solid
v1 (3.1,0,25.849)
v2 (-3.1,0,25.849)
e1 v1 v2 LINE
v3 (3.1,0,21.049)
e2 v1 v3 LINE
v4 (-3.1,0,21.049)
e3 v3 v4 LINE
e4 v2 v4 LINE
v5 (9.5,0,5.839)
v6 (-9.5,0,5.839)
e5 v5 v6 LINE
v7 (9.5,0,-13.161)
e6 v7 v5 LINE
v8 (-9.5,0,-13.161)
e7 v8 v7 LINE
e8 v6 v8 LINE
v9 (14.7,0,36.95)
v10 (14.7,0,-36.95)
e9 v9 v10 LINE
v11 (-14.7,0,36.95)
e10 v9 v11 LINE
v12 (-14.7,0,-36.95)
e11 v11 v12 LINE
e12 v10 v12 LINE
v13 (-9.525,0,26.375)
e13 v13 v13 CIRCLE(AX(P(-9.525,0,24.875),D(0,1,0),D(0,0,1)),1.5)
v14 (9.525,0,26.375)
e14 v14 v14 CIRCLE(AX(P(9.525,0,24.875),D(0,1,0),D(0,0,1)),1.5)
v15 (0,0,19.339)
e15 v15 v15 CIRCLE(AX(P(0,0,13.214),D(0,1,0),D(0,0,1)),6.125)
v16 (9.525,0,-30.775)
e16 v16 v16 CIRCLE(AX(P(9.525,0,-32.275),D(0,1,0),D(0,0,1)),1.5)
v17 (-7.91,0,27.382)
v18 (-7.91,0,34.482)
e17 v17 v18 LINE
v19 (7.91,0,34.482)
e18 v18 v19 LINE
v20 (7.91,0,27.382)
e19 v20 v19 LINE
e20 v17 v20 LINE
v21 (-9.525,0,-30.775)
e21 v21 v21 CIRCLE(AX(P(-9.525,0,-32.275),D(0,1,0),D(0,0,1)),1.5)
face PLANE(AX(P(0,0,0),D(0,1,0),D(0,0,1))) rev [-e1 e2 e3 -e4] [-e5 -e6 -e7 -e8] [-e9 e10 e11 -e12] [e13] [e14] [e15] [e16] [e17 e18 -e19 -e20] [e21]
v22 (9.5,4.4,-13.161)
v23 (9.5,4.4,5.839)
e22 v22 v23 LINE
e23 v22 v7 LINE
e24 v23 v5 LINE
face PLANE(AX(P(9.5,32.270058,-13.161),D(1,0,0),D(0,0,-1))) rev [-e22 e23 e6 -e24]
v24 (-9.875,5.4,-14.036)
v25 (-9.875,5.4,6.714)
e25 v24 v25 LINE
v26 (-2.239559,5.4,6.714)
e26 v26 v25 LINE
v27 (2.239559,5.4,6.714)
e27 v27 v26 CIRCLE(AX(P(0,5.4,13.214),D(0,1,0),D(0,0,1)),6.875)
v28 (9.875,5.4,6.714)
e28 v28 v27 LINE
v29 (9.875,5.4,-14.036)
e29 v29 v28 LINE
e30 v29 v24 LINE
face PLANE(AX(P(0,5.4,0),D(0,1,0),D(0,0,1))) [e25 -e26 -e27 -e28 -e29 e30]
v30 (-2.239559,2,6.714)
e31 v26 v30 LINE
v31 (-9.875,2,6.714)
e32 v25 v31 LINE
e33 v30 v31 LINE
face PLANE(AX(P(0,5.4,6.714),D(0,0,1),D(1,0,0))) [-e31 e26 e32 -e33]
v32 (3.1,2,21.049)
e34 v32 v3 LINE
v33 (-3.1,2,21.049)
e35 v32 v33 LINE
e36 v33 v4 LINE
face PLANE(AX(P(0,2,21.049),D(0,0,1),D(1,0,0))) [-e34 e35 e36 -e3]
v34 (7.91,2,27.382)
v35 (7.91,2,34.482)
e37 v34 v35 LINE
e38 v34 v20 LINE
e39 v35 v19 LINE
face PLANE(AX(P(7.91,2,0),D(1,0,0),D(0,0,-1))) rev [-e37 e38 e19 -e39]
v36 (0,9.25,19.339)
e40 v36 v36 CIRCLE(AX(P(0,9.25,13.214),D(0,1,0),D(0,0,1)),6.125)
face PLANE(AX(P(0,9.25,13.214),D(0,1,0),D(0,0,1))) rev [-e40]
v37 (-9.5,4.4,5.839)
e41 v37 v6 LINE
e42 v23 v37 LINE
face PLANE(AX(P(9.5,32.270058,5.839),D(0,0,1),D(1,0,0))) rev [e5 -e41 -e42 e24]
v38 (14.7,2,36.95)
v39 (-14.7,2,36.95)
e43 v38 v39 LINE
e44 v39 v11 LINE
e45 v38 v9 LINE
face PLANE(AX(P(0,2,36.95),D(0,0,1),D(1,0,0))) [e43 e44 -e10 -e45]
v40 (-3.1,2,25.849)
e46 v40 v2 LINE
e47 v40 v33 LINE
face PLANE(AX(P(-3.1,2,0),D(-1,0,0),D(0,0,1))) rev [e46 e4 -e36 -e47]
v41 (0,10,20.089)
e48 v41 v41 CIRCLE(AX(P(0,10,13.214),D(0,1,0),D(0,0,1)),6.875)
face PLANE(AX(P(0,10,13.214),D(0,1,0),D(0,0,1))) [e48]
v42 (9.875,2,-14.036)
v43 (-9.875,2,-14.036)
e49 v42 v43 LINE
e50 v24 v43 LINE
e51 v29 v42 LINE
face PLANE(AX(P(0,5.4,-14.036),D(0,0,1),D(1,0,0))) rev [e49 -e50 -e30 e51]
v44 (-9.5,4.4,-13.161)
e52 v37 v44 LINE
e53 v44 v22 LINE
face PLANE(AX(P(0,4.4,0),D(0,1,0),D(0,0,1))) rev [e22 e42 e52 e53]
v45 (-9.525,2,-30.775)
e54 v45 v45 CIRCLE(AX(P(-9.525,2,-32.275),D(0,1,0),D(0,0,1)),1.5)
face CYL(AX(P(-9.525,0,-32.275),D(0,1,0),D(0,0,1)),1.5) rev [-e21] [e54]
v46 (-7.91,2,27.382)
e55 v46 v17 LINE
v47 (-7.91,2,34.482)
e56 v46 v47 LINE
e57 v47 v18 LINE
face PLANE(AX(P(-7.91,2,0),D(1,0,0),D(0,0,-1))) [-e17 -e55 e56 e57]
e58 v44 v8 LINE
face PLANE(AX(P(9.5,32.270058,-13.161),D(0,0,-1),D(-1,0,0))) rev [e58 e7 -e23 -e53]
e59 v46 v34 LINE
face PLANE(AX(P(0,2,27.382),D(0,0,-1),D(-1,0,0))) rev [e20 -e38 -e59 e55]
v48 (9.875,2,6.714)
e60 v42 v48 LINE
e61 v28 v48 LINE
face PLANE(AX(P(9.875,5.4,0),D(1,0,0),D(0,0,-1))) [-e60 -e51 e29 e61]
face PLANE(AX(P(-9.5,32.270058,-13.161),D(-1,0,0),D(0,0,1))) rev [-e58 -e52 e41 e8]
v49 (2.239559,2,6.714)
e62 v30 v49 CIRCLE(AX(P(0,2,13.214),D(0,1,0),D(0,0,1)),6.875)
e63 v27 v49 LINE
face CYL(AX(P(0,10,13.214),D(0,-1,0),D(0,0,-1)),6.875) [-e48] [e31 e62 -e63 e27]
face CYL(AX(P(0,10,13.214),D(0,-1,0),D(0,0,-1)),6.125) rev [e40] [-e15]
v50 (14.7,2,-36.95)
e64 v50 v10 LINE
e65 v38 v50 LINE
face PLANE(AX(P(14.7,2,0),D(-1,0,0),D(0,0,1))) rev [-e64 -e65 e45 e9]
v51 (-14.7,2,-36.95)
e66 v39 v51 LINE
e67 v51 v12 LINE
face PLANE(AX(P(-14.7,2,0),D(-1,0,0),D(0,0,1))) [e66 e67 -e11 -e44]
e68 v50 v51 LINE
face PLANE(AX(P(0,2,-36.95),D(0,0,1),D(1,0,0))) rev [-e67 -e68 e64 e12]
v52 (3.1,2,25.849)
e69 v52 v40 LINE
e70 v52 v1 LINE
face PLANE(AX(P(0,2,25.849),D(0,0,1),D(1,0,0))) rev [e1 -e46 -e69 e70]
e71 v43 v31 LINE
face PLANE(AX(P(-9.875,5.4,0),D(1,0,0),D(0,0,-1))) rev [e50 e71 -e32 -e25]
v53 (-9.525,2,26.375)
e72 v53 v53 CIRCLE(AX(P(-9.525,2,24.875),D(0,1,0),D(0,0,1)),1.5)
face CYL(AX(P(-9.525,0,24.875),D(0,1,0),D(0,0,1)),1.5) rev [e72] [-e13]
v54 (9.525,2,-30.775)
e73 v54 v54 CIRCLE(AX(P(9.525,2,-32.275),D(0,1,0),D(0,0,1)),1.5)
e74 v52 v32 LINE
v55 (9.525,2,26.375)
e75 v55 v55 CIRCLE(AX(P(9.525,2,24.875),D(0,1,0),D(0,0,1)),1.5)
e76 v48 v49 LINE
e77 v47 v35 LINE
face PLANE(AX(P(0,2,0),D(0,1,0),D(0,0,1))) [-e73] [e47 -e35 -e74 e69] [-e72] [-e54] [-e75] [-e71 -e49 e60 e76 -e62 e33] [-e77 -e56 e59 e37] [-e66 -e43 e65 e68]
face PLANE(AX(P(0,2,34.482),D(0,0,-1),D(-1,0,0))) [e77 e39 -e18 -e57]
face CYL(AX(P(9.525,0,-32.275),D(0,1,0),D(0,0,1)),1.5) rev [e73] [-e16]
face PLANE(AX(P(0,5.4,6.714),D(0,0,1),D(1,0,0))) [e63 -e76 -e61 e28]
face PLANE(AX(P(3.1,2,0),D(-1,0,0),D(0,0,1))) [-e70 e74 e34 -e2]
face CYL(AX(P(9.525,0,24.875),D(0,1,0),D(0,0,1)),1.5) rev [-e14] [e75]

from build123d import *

# Parameters (mm, degrees)
SKETCH1_W               = 29.4
SKETCH1_H               = 73.9
SKETCH1_W_2             = 15.82
SKETCH1_H_2             = 7.1
SKETCH1_W_3             = 6.2
SKETCH1_H_3             = 4.8
BOSS_EXTRUDE1_DEPTH     = 2
SKETCH1_3_R             = 6.875
BOSS_EXTRUDE2_DEPTH     = 10
SHELL1_T                = -0.75
SKETCH1_4_W             = 19.75
SKETCH1_4_H             = 20.75
BOSS_EXTRUDE3_DEPTH     = 5.4
SKETCH2_W               = 19
SKETCH2_H               = 19
CUT_EXTRUDE1_DEPTH      = 4.4
CUT_EXTRUDE2_DEPTH      = 41.563437971
CUT_EXTRUDE2_DEPTH_BACK = 41.563437971


with BuildPart() as part:
    # Sketch1 → Boss-Extrude1 (new body)
    with BuildSketch(Plane(origin=(0, 0, 0), x_dir=(1, 0, 0), z_dir=(0, 1, 0))):
        Rectangle(SKETCH1_W, SKETCH1_H)
        with Locations((0, -30.932)):
            Rectangle(SKETCH1_W_2, SKETCH1_H_2, mode=Mode.SUBTRACT)
        with Locations((0, -23.449)):
            Rectangle(SKETCH1_W_3, SKETCH1_H_3, mode=Mode.SUBTRACT)
        with BuildLine():
            Line((-9.875, 14.036), (9.875, 14.036))
            Line((9.875, 14.036), (9.875, -6.714))
            Line((9.875, -6.714), (2.239559108, -6.714))
            ThreePointArc((2.239559108, -6.714), (0, -20.089), (-2.239559108, -6.714))
            Line((-2.239559108, -6.714), (-9.875, -6.714))
            Line((-9.875, -6.714), (-9.875, 14.036))
        make_face(mode=Mode.SUBTRACT)
    extrude(amount=BOSS_EXTRUDE1_DEPTH)



with BuildPart() as body_2:
    # Sketch1<3> → Boss-Extrude2 (new body)
    with BuildSketch(Plane(origin=(0, 0, 0), x_dir=(1, 0, 0), z_dir=(0, 1, 0))):
        with Locations(Location((0, -13.214, 0), (0, 0, 270))):
            Circle(SKETCH1_3_R)
    extrude(amount=BOSS_EXTRUDE2_DEPTH)

    # Shell1
    shell1_openings = [body_2.faces().sort_by_distance(p)[0] for p in [
        (0, 0, 13.214),
    ]]
    offset(amount=SHELL1_T, openings=shell1_openings, kind=Kind.INTERSECTION)


with BuildPart() as part_1:
    add(part.part)

    add(body_2.part)  # Boss-Extrude3 merges body 2
    # Sketch1<4> → Boss-Extrude3 (add)
    with BuildSketch(Plane(origin=(0, 0, 0), x_dir=(1, 0, 0), z_dir=(0, 1, 0))):
        with Locations((0, 3.661)):
            Rectangle(SKETCH1_4_W, SKETCH1_4_H)
    extrude(amount=BOSS_EXTRUDE3_DEPTH)

    # Sketch2 → Cut-Extrude1 (cut)
    with BuildSketch(Plane.XZ):
        with Locations((0, -3.661)):
            Rectangle(SKETCH2_W, SKETCH2_H)
    extrude(amount=-CUT_EXTRUDE1_DEPTH, mode=Mode.SUBTRACT)

    # Sketch3 → Cut-Extrude2 (cut, two sides: drawn at the far end of the back side and taken through both)
    with BuildSketch(Plane(origin=(0, 2, 0), x_dir=(1, 0, 0), z_dir=(0, 1, 0)).offset(-CUT_EXTRUDE2_DEPTH_BACK)):
        with BuildLine():
            Line((-9.525, 30.775), (-9.525, 32.275))
            Line((-9.525, 32.275), (-8.025, 32.275))
            ThreePointArc((-8.025, 32.275), (-10.585660172, 33.335660172), (-9.525, 30.775))
        make_face()
        with BuildLine():
            Line((-8.025, 32.275), (-9.525, 32.275))
            Line((-9.525, 32.275), (-9.525, 30.775))
            ThreePointArc((-9.525, 30.775), (-8.464339828, 31.214339828), (-8.025, 32.275))
        make_face()
        with BuildLine():
            ThreePointArc((11.025, 32.275), (9.525, 33.775), (8.025, 32.275))
            Line((8.025, 32.275), (9.525, 32.275))
            Line((9.525, 32.275), (9.525, 30.775))
            ThreePointArc((9.525, 30.775), (10.585660172, 31.214339828), (11.025, 32.275))
        make_face()
        with BuildLine():
            Line((9.525, 32.275), (8.025, 32.275))
            ThreePointArc((8.025, 32.275), (8.464339828, 31.214339828), (9.525, 30.775))
            Line((9.525, 30.775), (9.525, 32.275))
        make_face()
        with BuildLine():
            ThreePointArc((11.025, -24.875), (10.585660172, -23.814339828), (9.525, -23.375))
            Line((9.525, -23.375), (9.525, -24.875))
            Line((9.525, -24.875), (8.025, -24.875))
            ThreePointArc((8.025, -24.875), (9.525, -26.375), (11.025, -24.875))
        make_face()
        with BuildLine():
            Line((9.525, -24.875), (9.525, -23.375))
            ThreePointArc((9.525, -23.375), (8.464339828, -23.814339828), (8.025, -24.875))
            Line((8.025, -24.875), (9.525, -24.875))
        make_face()
        with BuildLine():
            ThreePointArc((-8.025, -24.875), (-8.464339828, -23.814339828), (-9.525, -23.375))
            Line((-9.525, -23.375), (-9.525, -24.875))
            Line((-9.525, -24.875), (-8.025, -24.875))
        make_face()
        with BuildLine():
            Line((-9.525, -24.875), (-9.525, -23.375))
            ThreePointArc((-9.525, -23.375), (-10.585660172, -25.935660172), (-8.025, -24.875))
            Line((-8.025, -24.875), (-9.525, -24.875))
        make_face()
    extrude(amount=CUT_EXTRUDE2_DEPTH + CUT_EXTRUDE2_DEPTH_BACK, mode=Mode.SUBTRACT)


solid = part_1.part
